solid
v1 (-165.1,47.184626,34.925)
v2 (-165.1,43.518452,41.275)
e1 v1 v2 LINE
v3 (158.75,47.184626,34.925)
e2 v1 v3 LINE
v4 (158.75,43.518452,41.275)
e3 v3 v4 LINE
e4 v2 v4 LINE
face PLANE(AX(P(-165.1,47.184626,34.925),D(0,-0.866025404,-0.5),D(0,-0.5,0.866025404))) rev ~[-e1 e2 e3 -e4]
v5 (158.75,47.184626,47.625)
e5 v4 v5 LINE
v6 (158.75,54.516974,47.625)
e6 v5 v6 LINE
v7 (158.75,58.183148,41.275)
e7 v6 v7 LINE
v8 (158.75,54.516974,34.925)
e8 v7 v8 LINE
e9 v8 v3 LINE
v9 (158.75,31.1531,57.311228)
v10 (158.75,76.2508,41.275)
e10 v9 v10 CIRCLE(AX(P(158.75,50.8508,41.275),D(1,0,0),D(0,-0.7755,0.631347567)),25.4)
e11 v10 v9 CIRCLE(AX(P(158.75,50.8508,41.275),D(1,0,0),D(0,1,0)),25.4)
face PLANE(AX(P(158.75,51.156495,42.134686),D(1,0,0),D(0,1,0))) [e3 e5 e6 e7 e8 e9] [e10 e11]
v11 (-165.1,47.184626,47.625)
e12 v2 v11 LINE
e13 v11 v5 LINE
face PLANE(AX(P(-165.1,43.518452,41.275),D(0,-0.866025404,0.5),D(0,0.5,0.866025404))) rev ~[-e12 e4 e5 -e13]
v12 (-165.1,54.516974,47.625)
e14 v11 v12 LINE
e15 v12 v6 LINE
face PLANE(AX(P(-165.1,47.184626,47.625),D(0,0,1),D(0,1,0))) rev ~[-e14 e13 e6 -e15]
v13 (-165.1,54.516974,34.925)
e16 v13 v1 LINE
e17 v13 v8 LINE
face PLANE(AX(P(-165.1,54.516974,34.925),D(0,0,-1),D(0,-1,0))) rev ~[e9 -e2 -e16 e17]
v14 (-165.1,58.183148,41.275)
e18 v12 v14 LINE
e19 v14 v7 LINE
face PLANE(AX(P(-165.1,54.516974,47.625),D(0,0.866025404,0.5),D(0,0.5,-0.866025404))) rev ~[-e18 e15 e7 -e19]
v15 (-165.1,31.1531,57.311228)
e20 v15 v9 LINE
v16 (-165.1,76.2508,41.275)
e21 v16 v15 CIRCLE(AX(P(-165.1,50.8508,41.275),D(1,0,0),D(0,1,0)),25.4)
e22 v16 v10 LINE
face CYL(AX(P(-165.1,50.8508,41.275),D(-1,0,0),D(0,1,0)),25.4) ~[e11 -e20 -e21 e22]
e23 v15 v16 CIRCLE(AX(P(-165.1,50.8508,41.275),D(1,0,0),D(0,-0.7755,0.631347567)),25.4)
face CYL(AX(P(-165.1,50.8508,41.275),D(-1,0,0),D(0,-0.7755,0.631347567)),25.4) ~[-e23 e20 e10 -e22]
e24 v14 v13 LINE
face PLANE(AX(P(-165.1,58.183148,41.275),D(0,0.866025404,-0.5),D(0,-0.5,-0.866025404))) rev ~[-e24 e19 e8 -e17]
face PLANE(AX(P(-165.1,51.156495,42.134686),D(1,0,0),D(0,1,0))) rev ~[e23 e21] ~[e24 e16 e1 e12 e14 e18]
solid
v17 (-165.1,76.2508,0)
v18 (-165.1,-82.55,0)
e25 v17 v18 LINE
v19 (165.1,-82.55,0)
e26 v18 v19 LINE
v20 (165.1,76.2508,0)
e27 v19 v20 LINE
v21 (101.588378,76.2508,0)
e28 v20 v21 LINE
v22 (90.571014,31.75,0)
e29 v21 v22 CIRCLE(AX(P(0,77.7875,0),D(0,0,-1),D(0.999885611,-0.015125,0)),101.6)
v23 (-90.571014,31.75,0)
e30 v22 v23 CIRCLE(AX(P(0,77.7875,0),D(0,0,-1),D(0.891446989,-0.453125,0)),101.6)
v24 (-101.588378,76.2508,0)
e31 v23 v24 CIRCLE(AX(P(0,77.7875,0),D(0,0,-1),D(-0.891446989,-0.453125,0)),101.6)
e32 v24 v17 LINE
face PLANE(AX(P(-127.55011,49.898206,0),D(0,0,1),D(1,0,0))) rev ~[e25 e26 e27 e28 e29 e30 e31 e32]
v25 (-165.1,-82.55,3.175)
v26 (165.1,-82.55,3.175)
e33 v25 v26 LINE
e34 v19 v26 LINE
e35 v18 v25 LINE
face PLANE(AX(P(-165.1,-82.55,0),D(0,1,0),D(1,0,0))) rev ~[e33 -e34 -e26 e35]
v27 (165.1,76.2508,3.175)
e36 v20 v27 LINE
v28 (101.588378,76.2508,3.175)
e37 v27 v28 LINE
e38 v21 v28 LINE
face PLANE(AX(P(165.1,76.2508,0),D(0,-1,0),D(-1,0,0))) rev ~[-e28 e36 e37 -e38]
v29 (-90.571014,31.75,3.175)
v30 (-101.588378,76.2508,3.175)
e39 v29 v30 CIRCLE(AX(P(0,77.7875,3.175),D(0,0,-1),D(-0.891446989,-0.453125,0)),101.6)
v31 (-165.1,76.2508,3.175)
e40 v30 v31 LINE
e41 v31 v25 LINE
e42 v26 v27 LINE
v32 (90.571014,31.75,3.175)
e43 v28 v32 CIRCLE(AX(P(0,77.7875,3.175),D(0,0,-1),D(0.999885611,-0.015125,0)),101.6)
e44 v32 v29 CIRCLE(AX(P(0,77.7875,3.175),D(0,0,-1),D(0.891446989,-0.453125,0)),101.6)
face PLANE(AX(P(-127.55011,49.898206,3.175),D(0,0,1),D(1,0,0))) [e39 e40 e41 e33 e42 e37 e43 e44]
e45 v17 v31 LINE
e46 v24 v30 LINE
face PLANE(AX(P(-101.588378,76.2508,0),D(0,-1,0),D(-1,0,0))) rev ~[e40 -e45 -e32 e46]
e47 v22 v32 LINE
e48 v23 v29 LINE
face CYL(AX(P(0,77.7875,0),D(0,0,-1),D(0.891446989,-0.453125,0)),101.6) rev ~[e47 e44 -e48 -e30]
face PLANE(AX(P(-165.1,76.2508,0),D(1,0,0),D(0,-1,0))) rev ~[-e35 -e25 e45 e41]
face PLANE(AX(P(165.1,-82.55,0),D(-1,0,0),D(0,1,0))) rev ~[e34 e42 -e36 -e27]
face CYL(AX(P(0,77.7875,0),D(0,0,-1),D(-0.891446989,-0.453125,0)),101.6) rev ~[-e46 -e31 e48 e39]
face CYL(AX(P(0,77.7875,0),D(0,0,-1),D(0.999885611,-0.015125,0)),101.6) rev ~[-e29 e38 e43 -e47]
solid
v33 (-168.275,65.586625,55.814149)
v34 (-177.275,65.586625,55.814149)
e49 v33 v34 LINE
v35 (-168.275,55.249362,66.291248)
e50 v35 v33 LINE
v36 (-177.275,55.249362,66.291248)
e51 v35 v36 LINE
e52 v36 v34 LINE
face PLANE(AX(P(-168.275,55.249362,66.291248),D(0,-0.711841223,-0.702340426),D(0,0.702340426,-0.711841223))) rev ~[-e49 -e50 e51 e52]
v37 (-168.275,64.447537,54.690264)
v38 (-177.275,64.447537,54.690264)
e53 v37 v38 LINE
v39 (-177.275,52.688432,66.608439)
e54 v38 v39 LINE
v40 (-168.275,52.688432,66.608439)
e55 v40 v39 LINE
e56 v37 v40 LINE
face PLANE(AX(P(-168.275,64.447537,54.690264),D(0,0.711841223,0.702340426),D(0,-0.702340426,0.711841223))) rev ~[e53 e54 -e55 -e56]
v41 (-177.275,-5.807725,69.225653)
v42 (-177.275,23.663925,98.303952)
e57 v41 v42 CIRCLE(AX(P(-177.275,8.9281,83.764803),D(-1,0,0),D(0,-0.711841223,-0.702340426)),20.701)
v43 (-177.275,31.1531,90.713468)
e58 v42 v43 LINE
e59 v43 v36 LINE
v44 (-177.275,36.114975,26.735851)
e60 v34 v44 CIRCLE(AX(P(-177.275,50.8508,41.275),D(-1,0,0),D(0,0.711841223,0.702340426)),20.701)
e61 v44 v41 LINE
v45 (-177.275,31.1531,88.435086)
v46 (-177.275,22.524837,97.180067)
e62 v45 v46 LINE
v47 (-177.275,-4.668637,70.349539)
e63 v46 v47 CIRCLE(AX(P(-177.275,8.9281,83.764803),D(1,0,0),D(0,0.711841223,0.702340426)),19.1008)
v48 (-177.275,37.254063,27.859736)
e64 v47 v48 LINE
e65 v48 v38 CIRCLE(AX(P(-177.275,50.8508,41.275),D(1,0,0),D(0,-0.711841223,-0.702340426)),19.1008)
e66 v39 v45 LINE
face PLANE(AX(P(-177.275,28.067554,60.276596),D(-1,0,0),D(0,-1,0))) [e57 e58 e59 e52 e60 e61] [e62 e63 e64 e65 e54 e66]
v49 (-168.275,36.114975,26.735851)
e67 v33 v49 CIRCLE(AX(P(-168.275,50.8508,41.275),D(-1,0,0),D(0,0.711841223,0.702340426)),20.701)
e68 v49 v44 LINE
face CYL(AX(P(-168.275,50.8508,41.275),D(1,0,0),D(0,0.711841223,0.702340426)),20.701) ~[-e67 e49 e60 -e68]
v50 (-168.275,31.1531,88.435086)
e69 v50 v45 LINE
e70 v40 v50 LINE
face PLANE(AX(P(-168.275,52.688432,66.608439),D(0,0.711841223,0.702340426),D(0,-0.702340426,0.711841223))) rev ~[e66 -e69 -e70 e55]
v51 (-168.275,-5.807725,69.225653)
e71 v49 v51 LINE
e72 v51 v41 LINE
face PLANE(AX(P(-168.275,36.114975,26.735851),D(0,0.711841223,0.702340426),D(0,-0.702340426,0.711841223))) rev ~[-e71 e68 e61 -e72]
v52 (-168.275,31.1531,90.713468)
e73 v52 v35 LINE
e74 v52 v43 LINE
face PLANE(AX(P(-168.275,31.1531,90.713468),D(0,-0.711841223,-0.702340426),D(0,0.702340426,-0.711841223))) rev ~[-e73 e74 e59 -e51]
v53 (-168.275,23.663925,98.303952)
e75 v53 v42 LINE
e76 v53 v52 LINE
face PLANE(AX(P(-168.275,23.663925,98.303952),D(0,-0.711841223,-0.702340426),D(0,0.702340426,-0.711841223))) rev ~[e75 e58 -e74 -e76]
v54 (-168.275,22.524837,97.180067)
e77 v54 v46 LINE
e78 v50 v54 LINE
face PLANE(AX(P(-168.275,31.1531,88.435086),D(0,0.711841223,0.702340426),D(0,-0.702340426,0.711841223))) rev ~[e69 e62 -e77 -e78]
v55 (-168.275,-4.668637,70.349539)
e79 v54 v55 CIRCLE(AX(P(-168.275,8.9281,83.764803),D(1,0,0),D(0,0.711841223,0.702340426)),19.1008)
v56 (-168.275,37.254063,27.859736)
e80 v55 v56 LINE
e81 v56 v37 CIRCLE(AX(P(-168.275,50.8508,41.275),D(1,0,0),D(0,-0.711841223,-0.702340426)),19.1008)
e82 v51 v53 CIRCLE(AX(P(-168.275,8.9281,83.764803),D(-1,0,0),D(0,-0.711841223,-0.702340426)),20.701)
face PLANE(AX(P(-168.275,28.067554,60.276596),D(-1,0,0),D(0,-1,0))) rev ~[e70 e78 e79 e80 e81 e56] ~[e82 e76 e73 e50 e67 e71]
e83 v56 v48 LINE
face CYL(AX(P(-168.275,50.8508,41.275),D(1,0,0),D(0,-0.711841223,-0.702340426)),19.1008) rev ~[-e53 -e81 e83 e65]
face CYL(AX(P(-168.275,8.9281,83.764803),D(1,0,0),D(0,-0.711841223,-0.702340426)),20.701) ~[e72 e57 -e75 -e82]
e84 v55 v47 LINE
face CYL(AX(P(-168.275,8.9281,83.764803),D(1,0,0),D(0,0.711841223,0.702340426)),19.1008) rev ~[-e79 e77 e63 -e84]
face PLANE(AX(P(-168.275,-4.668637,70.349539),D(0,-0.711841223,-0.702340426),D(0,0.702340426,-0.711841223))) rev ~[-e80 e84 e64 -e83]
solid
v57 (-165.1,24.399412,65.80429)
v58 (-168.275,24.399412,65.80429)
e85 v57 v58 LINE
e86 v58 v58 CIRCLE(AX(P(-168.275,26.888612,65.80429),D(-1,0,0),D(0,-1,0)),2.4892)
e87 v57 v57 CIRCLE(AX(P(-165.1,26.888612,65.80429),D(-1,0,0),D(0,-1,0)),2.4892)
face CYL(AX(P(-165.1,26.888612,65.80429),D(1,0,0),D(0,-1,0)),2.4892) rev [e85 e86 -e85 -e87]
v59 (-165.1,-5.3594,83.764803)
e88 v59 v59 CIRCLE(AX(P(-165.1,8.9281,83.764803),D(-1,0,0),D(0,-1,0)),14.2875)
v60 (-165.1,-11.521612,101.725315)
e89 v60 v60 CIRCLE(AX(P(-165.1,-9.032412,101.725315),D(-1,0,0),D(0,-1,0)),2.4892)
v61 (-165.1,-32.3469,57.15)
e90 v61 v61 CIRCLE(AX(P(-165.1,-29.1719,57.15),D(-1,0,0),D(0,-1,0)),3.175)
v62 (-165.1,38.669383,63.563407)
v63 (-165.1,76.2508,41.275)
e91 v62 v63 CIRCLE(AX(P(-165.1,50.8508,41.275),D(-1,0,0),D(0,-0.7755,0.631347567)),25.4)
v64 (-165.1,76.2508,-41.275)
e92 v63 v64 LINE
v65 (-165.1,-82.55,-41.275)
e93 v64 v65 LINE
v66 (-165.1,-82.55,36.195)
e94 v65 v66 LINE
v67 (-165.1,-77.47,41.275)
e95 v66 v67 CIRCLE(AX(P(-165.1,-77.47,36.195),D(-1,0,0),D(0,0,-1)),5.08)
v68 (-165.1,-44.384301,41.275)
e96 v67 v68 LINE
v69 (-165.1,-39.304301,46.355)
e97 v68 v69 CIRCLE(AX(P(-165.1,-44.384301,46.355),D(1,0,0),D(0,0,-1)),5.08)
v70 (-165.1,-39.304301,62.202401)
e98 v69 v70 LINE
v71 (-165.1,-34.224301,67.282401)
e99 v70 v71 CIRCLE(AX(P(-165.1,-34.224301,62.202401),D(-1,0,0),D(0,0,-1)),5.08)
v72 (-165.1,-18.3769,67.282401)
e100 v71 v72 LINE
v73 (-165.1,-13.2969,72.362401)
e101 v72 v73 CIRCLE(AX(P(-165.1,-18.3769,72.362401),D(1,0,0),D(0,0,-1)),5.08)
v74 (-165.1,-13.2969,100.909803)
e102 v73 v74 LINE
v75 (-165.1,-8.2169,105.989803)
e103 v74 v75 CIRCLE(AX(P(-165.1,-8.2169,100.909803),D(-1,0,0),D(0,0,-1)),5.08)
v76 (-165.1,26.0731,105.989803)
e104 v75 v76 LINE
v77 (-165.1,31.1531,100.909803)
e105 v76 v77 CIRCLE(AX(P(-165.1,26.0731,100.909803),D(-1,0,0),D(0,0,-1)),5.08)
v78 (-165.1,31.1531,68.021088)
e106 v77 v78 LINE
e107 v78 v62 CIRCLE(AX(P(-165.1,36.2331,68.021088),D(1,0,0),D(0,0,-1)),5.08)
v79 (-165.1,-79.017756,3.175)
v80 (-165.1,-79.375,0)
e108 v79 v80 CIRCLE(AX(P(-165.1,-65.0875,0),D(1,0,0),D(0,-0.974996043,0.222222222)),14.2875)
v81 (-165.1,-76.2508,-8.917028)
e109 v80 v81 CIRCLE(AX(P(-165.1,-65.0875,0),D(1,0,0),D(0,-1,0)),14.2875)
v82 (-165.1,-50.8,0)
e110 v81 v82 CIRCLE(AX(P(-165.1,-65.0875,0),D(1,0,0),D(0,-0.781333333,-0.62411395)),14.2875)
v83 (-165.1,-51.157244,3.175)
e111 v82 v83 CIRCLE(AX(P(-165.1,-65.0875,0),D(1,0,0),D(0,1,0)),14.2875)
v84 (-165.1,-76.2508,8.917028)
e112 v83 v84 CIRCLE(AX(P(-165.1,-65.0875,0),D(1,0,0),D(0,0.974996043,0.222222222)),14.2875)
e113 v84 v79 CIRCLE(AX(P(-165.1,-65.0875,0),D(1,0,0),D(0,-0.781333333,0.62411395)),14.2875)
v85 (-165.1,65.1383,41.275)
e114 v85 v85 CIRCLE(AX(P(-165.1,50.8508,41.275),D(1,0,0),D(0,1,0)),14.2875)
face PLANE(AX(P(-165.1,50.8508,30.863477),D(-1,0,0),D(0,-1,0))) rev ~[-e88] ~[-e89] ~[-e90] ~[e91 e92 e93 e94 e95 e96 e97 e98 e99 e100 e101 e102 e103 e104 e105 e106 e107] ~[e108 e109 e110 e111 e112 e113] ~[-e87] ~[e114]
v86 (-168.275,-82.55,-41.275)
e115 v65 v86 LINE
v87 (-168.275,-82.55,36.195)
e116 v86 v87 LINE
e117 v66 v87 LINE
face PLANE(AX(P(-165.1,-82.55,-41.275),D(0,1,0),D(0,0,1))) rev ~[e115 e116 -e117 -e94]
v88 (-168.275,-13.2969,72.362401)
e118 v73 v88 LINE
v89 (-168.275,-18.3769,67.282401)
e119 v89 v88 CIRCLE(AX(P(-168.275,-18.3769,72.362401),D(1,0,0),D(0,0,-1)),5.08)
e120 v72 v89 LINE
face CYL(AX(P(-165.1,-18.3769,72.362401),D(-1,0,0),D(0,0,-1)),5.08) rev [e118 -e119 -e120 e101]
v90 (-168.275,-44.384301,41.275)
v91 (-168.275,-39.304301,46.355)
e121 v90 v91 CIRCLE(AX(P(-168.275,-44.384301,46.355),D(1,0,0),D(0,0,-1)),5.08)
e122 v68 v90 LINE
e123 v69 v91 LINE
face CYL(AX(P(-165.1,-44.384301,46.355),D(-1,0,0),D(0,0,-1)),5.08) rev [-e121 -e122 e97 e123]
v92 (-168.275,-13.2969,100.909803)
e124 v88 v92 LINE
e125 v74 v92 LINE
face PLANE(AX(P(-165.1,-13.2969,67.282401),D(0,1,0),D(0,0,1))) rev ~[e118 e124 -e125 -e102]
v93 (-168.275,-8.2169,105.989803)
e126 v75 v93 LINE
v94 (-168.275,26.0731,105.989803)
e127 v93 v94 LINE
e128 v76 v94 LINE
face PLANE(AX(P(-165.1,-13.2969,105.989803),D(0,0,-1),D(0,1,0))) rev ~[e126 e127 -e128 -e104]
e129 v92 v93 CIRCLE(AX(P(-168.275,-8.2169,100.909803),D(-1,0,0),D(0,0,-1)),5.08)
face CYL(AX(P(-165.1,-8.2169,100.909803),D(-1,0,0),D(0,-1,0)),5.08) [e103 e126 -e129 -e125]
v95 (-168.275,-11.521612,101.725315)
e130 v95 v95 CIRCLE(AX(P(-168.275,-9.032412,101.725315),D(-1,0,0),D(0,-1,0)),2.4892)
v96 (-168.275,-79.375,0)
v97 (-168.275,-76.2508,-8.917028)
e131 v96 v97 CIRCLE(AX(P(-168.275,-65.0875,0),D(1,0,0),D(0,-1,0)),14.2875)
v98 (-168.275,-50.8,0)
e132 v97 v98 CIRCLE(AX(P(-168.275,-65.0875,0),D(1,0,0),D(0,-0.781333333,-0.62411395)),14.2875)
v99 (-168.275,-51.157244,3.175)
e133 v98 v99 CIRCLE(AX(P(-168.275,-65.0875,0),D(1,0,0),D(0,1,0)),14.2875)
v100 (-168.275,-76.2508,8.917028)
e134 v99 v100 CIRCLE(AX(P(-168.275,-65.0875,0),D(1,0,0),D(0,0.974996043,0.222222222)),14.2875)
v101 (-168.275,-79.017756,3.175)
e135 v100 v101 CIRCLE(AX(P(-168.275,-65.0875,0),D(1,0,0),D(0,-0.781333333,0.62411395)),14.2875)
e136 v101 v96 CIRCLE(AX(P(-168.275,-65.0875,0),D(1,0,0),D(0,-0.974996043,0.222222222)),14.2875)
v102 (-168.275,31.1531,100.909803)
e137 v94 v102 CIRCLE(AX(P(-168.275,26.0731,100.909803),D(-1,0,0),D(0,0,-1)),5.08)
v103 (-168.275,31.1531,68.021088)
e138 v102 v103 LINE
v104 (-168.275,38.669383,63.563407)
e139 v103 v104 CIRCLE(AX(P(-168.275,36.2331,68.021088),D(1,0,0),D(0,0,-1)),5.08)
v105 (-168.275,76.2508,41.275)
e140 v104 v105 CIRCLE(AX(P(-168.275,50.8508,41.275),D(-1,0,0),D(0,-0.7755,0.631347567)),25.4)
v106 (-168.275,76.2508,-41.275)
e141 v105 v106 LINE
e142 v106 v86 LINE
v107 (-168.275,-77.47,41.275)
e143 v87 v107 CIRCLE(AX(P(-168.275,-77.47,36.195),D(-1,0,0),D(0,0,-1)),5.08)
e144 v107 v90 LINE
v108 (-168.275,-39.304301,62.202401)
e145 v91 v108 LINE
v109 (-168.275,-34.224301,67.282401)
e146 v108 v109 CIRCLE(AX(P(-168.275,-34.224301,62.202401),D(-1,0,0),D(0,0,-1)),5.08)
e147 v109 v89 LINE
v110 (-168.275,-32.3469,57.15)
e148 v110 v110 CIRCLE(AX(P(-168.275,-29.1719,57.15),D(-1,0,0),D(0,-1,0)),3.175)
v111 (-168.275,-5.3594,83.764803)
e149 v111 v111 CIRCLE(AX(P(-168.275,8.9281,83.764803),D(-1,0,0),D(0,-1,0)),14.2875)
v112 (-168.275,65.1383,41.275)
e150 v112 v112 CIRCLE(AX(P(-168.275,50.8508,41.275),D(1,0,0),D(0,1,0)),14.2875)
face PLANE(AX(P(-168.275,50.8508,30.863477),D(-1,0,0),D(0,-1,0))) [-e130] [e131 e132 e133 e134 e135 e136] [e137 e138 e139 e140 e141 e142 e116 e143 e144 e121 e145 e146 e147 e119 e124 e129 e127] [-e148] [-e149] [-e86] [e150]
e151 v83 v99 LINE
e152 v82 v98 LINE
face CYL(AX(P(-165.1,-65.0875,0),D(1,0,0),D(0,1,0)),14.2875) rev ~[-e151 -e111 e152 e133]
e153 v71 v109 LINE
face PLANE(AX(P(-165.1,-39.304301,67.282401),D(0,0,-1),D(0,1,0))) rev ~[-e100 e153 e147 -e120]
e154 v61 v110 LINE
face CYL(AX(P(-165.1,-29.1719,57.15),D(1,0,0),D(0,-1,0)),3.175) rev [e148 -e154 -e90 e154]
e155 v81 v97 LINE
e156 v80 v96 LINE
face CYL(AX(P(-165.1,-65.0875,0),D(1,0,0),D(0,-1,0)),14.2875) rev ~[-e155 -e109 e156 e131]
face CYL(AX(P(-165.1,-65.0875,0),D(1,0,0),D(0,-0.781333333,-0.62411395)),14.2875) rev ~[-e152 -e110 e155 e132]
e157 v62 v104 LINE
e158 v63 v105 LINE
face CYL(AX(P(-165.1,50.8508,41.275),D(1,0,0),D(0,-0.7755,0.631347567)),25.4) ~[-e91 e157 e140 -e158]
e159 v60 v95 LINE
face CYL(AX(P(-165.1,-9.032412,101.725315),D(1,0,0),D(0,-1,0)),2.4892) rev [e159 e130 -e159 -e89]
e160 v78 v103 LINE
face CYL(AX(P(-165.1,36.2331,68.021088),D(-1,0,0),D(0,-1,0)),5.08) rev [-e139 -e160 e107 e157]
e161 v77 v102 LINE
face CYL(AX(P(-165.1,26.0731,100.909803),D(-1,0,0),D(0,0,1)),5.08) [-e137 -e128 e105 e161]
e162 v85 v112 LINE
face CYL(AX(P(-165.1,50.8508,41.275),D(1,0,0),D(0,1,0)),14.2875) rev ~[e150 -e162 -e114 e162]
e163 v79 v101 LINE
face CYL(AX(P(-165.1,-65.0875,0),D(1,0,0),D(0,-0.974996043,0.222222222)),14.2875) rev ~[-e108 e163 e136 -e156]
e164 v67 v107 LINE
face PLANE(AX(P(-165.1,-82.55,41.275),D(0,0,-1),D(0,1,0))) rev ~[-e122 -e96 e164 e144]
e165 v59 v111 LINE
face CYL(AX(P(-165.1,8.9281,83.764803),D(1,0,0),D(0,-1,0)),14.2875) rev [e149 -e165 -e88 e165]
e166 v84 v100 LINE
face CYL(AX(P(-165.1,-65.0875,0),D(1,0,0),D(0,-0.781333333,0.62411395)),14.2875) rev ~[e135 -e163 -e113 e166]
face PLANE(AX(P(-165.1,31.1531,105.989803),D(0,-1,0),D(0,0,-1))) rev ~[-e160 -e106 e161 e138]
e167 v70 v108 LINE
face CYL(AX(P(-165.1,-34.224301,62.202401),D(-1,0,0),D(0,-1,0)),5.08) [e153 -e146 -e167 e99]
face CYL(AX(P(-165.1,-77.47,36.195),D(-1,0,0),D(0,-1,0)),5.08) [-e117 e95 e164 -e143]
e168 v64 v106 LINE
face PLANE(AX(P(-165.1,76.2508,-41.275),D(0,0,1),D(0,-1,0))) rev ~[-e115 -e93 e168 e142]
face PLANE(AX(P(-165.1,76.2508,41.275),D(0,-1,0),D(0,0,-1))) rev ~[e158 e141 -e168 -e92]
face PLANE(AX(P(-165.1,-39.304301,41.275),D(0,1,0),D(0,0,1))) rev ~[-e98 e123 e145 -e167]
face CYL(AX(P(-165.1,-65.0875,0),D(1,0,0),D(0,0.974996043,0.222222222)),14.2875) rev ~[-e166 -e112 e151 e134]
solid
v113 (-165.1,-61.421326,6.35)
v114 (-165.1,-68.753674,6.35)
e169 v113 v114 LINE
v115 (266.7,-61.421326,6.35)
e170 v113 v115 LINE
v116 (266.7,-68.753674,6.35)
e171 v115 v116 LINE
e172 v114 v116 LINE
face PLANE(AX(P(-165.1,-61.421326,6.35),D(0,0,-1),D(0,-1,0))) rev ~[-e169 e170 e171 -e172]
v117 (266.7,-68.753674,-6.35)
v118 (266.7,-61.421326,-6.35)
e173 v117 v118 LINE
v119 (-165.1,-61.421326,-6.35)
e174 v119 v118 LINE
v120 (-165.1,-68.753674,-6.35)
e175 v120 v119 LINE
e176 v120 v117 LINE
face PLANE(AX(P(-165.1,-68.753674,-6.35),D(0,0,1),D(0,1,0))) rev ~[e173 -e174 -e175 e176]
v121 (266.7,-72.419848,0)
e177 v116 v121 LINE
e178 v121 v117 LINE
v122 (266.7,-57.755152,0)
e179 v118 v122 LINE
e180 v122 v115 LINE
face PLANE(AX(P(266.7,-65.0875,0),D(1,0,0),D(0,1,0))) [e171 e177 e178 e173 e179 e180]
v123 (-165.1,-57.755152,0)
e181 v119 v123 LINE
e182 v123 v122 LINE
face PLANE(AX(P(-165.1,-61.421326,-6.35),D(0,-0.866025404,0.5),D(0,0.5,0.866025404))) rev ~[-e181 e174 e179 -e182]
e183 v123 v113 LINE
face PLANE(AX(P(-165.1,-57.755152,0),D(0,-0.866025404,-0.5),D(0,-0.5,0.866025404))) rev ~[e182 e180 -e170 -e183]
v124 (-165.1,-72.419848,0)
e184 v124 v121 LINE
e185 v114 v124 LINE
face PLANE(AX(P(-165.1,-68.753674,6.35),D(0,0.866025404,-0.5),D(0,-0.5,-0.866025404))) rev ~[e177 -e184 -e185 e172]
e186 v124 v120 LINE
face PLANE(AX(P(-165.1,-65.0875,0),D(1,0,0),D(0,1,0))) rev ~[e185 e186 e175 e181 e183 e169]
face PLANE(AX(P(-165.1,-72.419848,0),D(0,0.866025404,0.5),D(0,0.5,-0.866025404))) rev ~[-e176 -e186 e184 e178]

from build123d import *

# Parameters (mm, degrees)
F0_W     = 17.6947293282
F0_H     = 38.2016
F0_W_2   = 6.35
F0_H_2   = 28.575
F1_DEPTH = 3.175
F2_R     = 3.175
F2_R_2   = 2.4892
F2_R_3   = 14.2875
F3_DEPTH = 3.175
F4_R     = 14.2875
F5_DEPTH = 323.85
F6_DEPTH = 431.8
F8_DEPTH = 9
F9_R     = 5.08


# Not quite as in the source:
# - a feature names something its author has since deleted; it is built from what else it names


with BuildPart() as f1:
    # F0 (on Top) → F1 (new body)
    with BuildSketch(Plane.XY):
        with BuildLine():
            ThreePointArc((-90.5710140925, 31.75), (-98.622453308, 53.3708723969), (-101.5883780415, 76.2508))
            Line((-101.5883780415, 76.2508), (-147.4052706718, 76.2508))
            Line((-147.4052706718, 76.2508), (-147.4052706718, 38.0492))
            Line((-147.4052706718, 38.0492), (-165.1, 38.0492))
            Line((-165.1, 38.0492), (-165.1, 31.75))
            Line((-165.1, 31.75), (-90.5710140925, 31.75))
        make_face()
        with Locations((-156.2526353359, 57.15)):
            Rectangle(F0_W, F0_H)
        with BuildLine():
            Line((165.1, 76.2508), (101.5883780415, 76.2508))
            ThreePointArc((101.5883780415, 76.2508), (98.622453308, 53.3708723969), (90.5710140925, 31.75))
            Line((90.5710140925, 31.75), (165.1, 31.75))
            Line((165.1, 31.75), (165.1, 76.2508))
        make_face()
        with BuildLine():
            ThreePointArc((90.5710140925, 31.75), (0, -23.8125), (-90.5710140925, 31.75))
            Line((-90.5710140925, 31.75), (-165.1, 31.75))
            Line((-165.1, 31.75), (-165.1, -47.625))
            Line((-165.1, -47.625), (-158.75, -47.625))
            Line((-158.75, -47.625), (-158.75, -76.2))
            Line((-158.75, -76.2), (-165.1, -76.2))
            Line((-165.1, -76.2), (-165.1, -82.55))
            Line((-165.1, -82.55), (165.1, -82.55))
            Line((165.1, -82.55), (165.1, 31.75))
            Line((165.1, 31.75), (90.5710140925, 31.75))
        make_face()
        with Locations((-161.925, -61.9125)):
            Rectangle(F0_W_2, F0_H_2)
    extrude(amount=F1_DEPTH)


with BuildPart() as f3:
    # F2 (on face) → F3 (new body)
    with BuildSketch(Plane(origin=(-165.1, 0, 0), x_dir=(0, -1, 0), z_dir=(-1, 0, 0))):
        with BuildLine():
            Line((-31.1531, 41.275), (-36.5633, 41.275))
            ThreePointArc((-36.5633, 41.275), (-50.8508, 26.9875), (-65.1383, 41.275))
            Line((-65.1383, 41.275), (-76.2508, 41.275))
            ThreePointArc((-76.2508, 41.275), (-50.8508, 15.875), (-25.4508, 41.275))
            Line((-25.4508, 41.275), (-31.1531, 41.275))
        make_face()
        with BuildLine():
            Line((-31.1531, 57.3112281946), (-31.1531, 41.275))
            Line((-31.1531, 41.275), (-25.4508, 41.275))
            ThreePointArc((-25.4508, 41.275), (-26.9187965318, 49.7849477084), (-31.1531, 57.3112281946))
        make_face()
        with BuildLine():
            Line((50.8, 0), (-76.2508, 0))
            Line((-76.2508, 0), (-76.2508, -41.275))
            Line((-76.2508, -41.275), (76.2508, -41.275))
            Line((76.2508, -41.275), (76.2508, -8.9170280565))
            ThreePointArc((76.2508, -8.9170280565), (60.3632536315, -13.4838478373), (50.8, 0))
        make_face()
        with BuildLine():
            Line((76.2508, 41.275), (76.2508, 8.9170280565))
            ThreePointArc((76.2508, 8.9170280565), (77.9585667504, 6.2022815929), (79.017755965, 3.175))
            Line((79.017755965, 3.175), (82.55, 3.175))
            Line((82.55, 3.175), (82.55, 41.275))
            Line((82.55, 41.275), (76.2508, 41.275))
        make_face()
        with BuildLine():
            Line((76.2508, -8.9170280565), (76.2508, -41.275))
            Line((76.2508, -41.275), (82.55, -41.275))
            Line((82.55, -41.275), (82.55, 0))
            Line((82.55, 0), (79.375, 0))
            ThreePointArc((79.375, 0), (78.5713478373, -4.7242463685), (76.2508, -8.9170280565))
        make_face()
        Polygon((13.2969, 61.5398025967), (13.2969, 41.275), (39.3043012984, 41.275), (39.3043012984, 67.2824012984), (13.2969, 67.2824012984), align=None)
        with Locations((29.1719, 57.15)):
            Circle(F2_R, mode=Mode.SUBTRACT)
        with BuildLine():
            ThreePointArc((-31.1531, 57.3112281946), (-26.9187965318, 49.7849477084), (-25.4508, 41.275))
            Line((-25.4508, 41.275), (13.2969, 41.275))
            Line((13.2969, 41.275), (13.2969, 61.5398025967))
            Line((13.2969, 61.5398025967), (-31.1531, 61.5398025967))
            Line((-31.1531, 61.5398025967), (-31.1531, 57.3112281946))
        make_face()
        with BuildLine():
            Line((51.157244035, 3.175), (-76.2508, 3.175))
            Line((-76.2508, 3.175), (-76.2508, 0))
            Line((-76.2508, 0), (50.8, 0))
            ThreePointArc((50.8, 0), (50.8895919085, 1.5975174726), (51.157244035, 3.175))
        make_face()
        with BuildLine():
            Line((82.55, 3.175), (79.017755965, 3.175))
            ThreePointArc((79.017755965, 3.175), (79.2854080915, 1.5975174726), (79.375, 0))
            Line((79.375, 0), (82.55, 0))
            Line((82.55, 0), (82.55, 3.175))
        make_face()
        Polygon((-31.1531, 105.9898025967), (-31.1531, 61.5398025967), (13.2969, 61.5398025967), (13.2969, 67.2824012984), (13.2969, 73.025), (13.2969, 105.9898025967), align=None)
        with Locations((-26.8886122421, 65.8042903546)):
            Circle(F2_R_2, mode=Mode.SUBTRACT)
        with Locations((-8.9281, 83.7648025967)):
            Circle(F2_R_3, mode=Mode.SUBTRACT)
        with Locations((9.0324122421, 101.7253148389)):
            Circle(F2_R_2, mode=Mode.SUBTRACT)
        with BuildLine():
            Line((13.2969, 41.275), (-25.4508, 41.275))
            ThreePointArc((-25.4508, 41.275), (-50.8508, 15.875), (-76.2508, 41.275))
            Line((-76.2508, 41.275), (-76.2508, 3.175))
            Line((-76.2508, 3.175), (51.157244035, 3.175))
            ThreePointArc((51.157244035, 3.175), (61.9005370447, 13.9275239498), (76.2508, 8.9170280565))
            Line((76.2508, 8.9170280565), (76.2508, 41.275))
            Line((76.2508, 41.275), (45.0469, 41.275))
            Line((45.0469, 41.275), (39.3043012984, 41.275))
            Line((39.3043012984, 41.275), (13.2969, 41.275))
        make_face()
        with BuildLine():
            ThreePointArc((-65.1383, 41.275), (-50.8508, 55.5625), (-36.5633, 41.275))
            Line((-36.5633, 41.275), (-31.1531, 41.275))
            Line((-31.1531, 41.275), (-31.1531, 57.3112281946))
            ThreePointArc((-31.1531, 57.3112281946), (-59.3607477084, 65.2070034682), (-76.2508, 41.275))
            Line((-76.2508, 41.275), (-65.1383, 41.275))
        make_face()
    extrude(amount=F3_DEPTH)

    # F9
    f9_edges = [f3.edges().sort_by_distance(p)[0] for p in [
        (-166.6875, 76.2508, 41.275),
        (-166.6875, -39.304301, 41.275),
        (-166.6875, -82.55, 41.275),
        (-166.6875, -39.304301, 67.282401),
        (-166.6875, -13.2969, 67.282401),
        (-166.6875, -13.2969, 105.989803),
        (-166.6875, 31.1531, 105.989803),
        (-166.6875, 31.1531, 57.311228),
    ]]
    fillet(f9_edges, radius=F9_R)


with BuildPart() as f5:
    # F4 (on face) → F5 (new body)
    with BuildSketch(Plane.YZ.offset(-165.1)):
        with BuildLine():
            ThreePointArc((31.1531, 57.3112281946), (42.3408522916, 17.3429965318), (76.2508, 41.275))
            ThreePointArc((76.2508, 41.275), (59.3607477084, 65.2070034682), (31.1531, 57.3112281946))
        make_face()
        with Locations((50.8508, 41.275)):
            Circle(F4_R, mode=Mode.SUBTRACT)
        with Locations((50.8508, 41.275)):
            Circle(F4_R)
        Polygon((43.5184515813, 41.275), (47.1846257906, 47.625), (54.5169742094, 47.625), (58.1831484187, 41.275), (54.5169742094, 34.925), (47.1846257906, 34.925), align=None, mode=Mode.SUBTRACT)
    extrude(amount=F5_DEPTH)


with BuildPart() as f6:
    # F4 (on face) → F6 (new body)
    with BuildSketch(Plane.YZ.offset(-165.1)):
        Polygon((-61.4213257906, 6.35), (-68.7536742094, 6.35), (-72.4198484187, 0), (-68.7536742094, -6.35), (-61.4213257906, -6.35), (-57.7551515813, 0), align=None)
    extrude(amount=F6_DEPTH)


with BuildPart() as f8:
    # F7 (on face) → F8 (new body)
    with BuildSketch(Plane(origin=(-168.275, 0, 0), x_dir=(0, -1, 0), z_dir=(-1, 0, 0))):
        with BuildLine():
            ThreePointArc((-37.254063169, 27.859736), (-64.266064, 27.678263169), (-64.447536831, 54.690264))
            Line((-64.447536831, 54.690264), (-52.6884316676, 66.6084385715))
            ThreePointArc((-52.6884316676, 66.6084385715), (-53.9729276626, 66.4823861965), (-55.2493622465, 66.2912477235))
            Line((-55.2493622465, 66.2912477235), (-65.5866251559, 55.8141491489))
            ThreePointArc((-65.5866251559, 55.8141491489), (-65.3899491489, 26.5391748441), (-36.1149748441, 26.7358508511))
            Line((-36.1149748441, 26.7358508511), (5.8077251559, 69.2256534478))
            ThreePointArc((5.8077251559, 69.2256534478), (5.6110491489, 98.5006277526), (-23.6639251559, 98.3039517457))
            Line((-23.6639251559, 98.3039517457), (-31.1531, 90.7134682907))
            Line((-31.1531, 90.7134682907), (-31.1531, 88.4350859823))
            Line((-31.1531, 88.4350859823), (-22.524836831, 97.1800665967))
            ThreePointArc((-22.524836831, 97.1800665967), (4.487164, 97.3615394277), (4.668636831, 70.3495385967))
            Line((4.668636831, 70.3495385967), (-37.254063169, 27.859736))
        make_face()
        with BuildLine():
            ThreePointArc((-55.2493622465, 66.2912477235), (-53.9729276626, 66.4823861965), (-52.6884316676, 66.6084385715))
            Line((-52.6884316676, 66.6084385715), (-31.1531, 88.4350859823))
            Line((-31.1531, 88.4350859823), (-31.1531, 90.7134682907))
            Line((-31.1531, 90.7134682907), (-55.2493622465, 66.2912477235))
        make_face()
    extrude(amount=F8_DEPTH)


solid = Compound([f1.part, f3.part, f5.part, f6.part, f8.part])
